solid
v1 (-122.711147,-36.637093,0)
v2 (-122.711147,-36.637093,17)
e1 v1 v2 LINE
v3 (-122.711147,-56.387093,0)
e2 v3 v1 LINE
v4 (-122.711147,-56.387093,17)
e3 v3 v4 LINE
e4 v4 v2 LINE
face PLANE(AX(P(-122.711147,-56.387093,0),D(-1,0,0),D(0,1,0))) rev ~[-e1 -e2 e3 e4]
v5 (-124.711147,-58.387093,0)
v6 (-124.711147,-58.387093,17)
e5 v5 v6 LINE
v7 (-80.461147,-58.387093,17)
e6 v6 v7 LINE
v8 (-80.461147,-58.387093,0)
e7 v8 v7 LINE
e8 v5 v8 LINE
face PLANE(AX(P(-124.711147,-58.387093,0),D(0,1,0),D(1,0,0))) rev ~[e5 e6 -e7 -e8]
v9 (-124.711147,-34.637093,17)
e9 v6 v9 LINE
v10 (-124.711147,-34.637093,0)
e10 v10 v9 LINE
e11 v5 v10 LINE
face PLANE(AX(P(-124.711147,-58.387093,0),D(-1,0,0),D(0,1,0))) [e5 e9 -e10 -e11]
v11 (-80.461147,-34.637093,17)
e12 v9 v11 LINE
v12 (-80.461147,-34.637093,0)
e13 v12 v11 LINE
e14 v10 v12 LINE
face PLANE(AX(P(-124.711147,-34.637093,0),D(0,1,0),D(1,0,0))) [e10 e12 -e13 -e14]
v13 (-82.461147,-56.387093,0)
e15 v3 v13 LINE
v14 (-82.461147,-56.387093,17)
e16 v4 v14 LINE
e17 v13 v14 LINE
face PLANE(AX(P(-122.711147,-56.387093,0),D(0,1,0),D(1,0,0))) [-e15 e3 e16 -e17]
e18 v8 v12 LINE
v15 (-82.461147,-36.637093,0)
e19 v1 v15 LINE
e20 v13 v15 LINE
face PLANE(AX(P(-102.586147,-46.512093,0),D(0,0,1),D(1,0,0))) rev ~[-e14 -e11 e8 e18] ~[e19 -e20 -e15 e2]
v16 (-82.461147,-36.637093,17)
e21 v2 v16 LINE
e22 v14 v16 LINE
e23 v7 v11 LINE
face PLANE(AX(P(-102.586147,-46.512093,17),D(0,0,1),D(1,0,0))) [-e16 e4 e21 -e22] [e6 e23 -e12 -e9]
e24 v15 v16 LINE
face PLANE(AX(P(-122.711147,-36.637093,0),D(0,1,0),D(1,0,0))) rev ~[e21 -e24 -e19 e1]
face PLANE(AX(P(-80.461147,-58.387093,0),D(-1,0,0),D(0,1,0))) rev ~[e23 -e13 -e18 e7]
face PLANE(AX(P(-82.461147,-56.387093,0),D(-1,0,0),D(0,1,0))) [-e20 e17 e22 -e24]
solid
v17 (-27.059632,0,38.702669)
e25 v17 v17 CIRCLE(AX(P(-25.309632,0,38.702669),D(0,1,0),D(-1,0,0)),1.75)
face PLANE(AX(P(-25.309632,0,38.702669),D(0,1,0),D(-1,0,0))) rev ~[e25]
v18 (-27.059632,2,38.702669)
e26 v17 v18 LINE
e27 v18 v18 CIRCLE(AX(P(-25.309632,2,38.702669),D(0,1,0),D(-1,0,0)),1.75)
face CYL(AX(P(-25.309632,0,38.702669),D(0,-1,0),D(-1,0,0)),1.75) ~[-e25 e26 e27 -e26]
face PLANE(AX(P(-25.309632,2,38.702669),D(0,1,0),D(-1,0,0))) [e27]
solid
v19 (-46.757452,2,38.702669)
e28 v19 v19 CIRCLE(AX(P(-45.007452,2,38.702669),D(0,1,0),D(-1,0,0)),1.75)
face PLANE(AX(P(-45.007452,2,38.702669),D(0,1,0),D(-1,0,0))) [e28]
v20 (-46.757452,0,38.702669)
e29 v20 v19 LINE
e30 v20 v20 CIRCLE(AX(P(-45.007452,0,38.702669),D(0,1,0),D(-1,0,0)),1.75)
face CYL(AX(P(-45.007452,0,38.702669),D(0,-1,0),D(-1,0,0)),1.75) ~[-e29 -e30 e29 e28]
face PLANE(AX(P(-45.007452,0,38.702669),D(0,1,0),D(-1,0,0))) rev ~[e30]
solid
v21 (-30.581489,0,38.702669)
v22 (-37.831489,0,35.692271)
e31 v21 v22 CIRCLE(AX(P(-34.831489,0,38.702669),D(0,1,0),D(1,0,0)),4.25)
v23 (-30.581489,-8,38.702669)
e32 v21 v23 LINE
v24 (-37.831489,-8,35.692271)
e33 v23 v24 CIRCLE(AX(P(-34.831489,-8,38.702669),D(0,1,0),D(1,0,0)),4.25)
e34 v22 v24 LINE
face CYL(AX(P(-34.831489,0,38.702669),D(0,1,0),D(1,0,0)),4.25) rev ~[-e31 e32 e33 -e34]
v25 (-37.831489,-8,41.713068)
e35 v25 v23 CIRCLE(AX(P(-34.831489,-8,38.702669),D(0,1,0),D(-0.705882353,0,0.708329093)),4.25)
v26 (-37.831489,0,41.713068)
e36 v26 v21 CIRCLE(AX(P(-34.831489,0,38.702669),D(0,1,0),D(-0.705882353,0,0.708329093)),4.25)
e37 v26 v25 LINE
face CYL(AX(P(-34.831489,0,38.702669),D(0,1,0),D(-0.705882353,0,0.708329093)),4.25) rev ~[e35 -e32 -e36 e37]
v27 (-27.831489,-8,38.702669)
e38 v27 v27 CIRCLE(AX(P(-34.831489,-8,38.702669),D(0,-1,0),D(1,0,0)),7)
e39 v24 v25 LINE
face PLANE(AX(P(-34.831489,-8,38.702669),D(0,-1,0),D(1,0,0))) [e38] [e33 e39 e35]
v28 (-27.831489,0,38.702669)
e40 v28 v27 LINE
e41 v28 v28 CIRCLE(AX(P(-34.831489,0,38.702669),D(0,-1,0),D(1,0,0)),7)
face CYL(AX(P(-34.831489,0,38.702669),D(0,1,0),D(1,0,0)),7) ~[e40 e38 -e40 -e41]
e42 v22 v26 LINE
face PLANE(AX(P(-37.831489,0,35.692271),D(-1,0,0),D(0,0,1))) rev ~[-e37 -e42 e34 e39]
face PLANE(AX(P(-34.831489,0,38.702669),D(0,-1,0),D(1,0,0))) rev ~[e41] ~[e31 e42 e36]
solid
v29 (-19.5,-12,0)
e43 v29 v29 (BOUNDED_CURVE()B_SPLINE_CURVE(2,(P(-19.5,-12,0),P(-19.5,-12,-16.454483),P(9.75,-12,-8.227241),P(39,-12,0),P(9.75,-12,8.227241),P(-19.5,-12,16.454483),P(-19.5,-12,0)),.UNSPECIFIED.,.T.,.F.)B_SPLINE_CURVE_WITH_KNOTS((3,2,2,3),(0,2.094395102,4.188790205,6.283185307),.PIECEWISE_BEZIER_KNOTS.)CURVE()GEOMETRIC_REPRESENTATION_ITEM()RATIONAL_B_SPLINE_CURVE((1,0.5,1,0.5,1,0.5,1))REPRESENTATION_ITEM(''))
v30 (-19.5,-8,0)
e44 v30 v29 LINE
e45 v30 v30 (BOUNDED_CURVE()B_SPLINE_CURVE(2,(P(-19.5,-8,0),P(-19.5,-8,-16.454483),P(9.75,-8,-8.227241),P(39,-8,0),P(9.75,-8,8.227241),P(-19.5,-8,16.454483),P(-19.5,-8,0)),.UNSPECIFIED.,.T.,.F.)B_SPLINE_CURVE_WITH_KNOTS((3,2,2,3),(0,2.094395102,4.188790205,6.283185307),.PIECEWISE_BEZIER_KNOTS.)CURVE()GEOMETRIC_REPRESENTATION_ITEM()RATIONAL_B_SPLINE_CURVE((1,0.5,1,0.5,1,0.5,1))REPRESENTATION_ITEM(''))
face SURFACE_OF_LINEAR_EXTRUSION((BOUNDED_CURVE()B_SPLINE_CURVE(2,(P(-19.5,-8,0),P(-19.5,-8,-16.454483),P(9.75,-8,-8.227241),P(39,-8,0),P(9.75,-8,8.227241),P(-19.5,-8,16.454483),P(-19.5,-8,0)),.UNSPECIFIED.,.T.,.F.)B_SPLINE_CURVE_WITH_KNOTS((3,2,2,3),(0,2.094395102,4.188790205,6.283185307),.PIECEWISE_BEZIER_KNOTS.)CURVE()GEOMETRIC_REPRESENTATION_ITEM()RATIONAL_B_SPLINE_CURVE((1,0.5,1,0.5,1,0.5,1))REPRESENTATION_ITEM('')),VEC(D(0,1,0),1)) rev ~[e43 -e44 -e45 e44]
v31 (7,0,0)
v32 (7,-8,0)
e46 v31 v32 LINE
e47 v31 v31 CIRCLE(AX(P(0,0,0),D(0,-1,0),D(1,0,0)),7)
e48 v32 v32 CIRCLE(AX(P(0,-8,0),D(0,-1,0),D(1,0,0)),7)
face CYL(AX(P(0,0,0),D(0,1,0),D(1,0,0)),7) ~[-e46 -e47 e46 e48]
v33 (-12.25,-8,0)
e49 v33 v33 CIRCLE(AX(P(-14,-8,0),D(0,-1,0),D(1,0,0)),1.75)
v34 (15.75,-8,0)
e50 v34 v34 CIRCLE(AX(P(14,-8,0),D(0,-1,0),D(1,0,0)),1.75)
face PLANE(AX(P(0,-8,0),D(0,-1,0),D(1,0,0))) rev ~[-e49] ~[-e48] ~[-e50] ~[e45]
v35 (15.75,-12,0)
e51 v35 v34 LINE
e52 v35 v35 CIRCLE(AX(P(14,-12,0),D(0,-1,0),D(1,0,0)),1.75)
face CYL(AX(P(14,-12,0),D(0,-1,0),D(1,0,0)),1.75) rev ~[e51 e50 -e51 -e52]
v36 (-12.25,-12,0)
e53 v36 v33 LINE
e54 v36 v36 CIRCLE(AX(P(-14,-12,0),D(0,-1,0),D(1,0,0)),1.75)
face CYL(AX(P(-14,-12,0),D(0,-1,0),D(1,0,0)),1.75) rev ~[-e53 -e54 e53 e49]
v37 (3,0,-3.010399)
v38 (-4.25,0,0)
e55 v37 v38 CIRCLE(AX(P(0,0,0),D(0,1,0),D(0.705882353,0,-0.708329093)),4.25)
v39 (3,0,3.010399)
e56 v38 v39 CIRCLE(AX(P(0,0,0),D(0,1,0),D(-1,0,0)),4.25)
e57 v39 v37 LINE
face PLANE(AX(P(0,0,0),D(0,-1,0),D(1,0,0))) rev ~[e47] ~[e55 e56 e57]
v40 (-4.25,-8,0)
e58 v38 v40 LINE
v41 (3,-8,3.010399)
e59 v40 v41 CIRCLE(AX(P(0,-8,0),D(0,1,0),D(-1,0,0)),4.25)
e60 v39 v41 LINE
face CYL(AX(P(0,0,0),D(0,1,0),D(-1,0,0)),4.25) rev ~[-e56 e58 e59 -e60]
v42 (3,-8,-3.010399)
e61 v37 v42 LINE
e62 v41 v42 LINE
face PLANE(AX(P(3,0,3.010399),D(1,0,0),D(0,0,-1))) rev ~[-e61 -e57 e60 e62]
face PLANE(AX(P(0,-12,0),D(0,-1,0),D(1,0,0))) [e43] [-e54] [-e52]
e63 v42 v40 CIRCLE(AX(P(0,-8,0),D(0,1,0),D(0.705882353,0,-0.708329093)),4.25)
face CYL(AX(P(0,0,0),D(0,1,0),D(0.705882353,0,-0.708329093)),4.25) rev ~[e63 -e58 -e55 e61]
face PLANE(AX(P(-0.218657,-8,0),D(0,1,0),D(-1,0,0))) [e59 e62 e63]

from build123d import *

# Parameters (mm, degrees)
F0_R      = 7
F1_DEPTH  = 8
F3_DEPTH  = 4
F4_R      = 1.75
F5_DEPTH  = 4
F7_DEPTH  = 8
F8_W      = 44.25
F8_H      = 23.75
F8_W_2    = 40.25
F8_H_2    = 19.75
F9_DEPTH  = 17
F10_R     = 7
F11_DEPTH = 8
F12_R     = 1.75
F13_DEPTH = 2


with BuildPart() as f1:
    # F0 (on Front) → F1 (new body)
    with BuildSketch(Plane.XZ):
        Circle(F0_R)
    extrude(amount=F1_DEPTH)

    # F2 (on face) → F3 (join)
    with BuildSketch(Plane.XZ.offset(8)):
        with BuildLine():
            add(Edge.make_bspline(
                [(-19.5, 0), (-19.5, -16.4544826719), (9.75, -8.227241336), (39, 0), (9.75, 8.227241336), (-19.5, 16.4544826719), (-19.5, 0)],
                knots=[0, 0, 0, 2.0943951024, 2.0943951024, 4.1887902048, 4.1887902048, 6.2831853072, 6.2831853072, 6.2831853072], degree=2, weights=[1, 0.5, 1, 0.5, 1, 0.5, 1]))
        make_face()
    extrude(amount=F3_DEPTH)

    # F4 (on face) → F5 (cut)
    with BuildSketch(Plane.XZ.offset(12)):
        with Locations((-14, 0)):
            Circle(F4_R)
        with Locations((14, 0)):
            Circle(F4_R)
    extrude(amount=-F5_DEPTH, mode=Mode.SUBTRACT)

    # F6 (on face) → F7 (cut)
    with BuildSketch(Plane(origin=(0, 0, 0), x_dir=(-1, 0, 0), z_dir=(0, 1, 0))):
        with BuildLine():
            ThreePointArc((-3, -3.0103986447), (1.6298006013, -3.925079617), (4.25, 0))
            ThreePointArc((4.25, 0), (1.6298006013, 3.925079617), (-3, 3.0103986447))
            Line((-3, 3.0103986447), (-3, 0))
            Line((-3, 0), (-3, -3.0103986447))
        make_face()
    extrude(amount=-F7_DEPTH, mode=Mode.SUBTRACT)


with BuildPart() as f9:
    # F8 (on Top) → F9 (new body)
    with BuildSketch(Plane.XY):
        with Locations((-102.5861466527, -46.512093246)):
            Rectangle(F8_W, F8_H)
        with Locations((-102.5861466527, -46.512093246)):
            Rectangle(F8_W_2, F8_H_2, mode=Mode.SUBTRACT)
    extrude(amount=F9_DEPTH)


with BuildPart() as f11:
    # F10 (on Front) → F11 (new body)
    with BuildSketch(Plane.XZ):
        with Locations((-34.8314889967, 38.7026694899)):
            Circle(F10_R)
        with BuildLine():
            ThreePointArc((-37.8314889967, 41.7130681346), (-33.2016883954, 42.6277491069), (-30.5814889967, 38.7026694899))
            ThreePointArc((-30.5814889967, 38.7026694899), (-33.2016883954, 34.7775898728), (-37.8314889967, 35.6922708452))
            ThreePointArc((-37.8314889967, 35.6922708452), (-39.0814889967, 38.7026694899), (-37.8314889967, 41.7130681346))
        make_face(mode=Mode.SUBTRACT)
        with BuildLine():
            Line((-37.8314889967, 38.7026694899), (-37.8314889967, 41.7130681346))
            ThreePointArc((-37.8314889967, 41.7130681346), (-39.0814889967, 38.7026694899), (-37.8314889967, 35.6922708452))
            Line((-37.8314889967, 35.6922708452), (-37.8314889967, 38.7026694899))
        make_face()
    extrude(amount=F11_DEPTH)


with BuildPart() as f13:
    # F12 (on face) → F13 (new body)
    with BuildSketch(Plane(origin=(0, 0, 0), x_dir=(-1, 0, 0), z_dir=(0, 1, 0))):
        with Locations((25.309631601, 38.7026694899)):
            Circle(F12_R)
    extrude(amount=F13_DEPTH)


with BuildPart() as f13b:
    # F12 (on face) → F13, piece 2 (new body)
    with BuildSketch(Plane(origin=(0, 0, 0), x_dir=(-1, 0, 0), z_dir=(0, 1, 0))):
        with Locations((45.0074523687, 38.7026694899)):
            Circle(F12_R)
    extrude(amount=F13_DEPTH)


solid = Compound([f1.part, f9.part, f11.part, f13.part, f13b.part])
